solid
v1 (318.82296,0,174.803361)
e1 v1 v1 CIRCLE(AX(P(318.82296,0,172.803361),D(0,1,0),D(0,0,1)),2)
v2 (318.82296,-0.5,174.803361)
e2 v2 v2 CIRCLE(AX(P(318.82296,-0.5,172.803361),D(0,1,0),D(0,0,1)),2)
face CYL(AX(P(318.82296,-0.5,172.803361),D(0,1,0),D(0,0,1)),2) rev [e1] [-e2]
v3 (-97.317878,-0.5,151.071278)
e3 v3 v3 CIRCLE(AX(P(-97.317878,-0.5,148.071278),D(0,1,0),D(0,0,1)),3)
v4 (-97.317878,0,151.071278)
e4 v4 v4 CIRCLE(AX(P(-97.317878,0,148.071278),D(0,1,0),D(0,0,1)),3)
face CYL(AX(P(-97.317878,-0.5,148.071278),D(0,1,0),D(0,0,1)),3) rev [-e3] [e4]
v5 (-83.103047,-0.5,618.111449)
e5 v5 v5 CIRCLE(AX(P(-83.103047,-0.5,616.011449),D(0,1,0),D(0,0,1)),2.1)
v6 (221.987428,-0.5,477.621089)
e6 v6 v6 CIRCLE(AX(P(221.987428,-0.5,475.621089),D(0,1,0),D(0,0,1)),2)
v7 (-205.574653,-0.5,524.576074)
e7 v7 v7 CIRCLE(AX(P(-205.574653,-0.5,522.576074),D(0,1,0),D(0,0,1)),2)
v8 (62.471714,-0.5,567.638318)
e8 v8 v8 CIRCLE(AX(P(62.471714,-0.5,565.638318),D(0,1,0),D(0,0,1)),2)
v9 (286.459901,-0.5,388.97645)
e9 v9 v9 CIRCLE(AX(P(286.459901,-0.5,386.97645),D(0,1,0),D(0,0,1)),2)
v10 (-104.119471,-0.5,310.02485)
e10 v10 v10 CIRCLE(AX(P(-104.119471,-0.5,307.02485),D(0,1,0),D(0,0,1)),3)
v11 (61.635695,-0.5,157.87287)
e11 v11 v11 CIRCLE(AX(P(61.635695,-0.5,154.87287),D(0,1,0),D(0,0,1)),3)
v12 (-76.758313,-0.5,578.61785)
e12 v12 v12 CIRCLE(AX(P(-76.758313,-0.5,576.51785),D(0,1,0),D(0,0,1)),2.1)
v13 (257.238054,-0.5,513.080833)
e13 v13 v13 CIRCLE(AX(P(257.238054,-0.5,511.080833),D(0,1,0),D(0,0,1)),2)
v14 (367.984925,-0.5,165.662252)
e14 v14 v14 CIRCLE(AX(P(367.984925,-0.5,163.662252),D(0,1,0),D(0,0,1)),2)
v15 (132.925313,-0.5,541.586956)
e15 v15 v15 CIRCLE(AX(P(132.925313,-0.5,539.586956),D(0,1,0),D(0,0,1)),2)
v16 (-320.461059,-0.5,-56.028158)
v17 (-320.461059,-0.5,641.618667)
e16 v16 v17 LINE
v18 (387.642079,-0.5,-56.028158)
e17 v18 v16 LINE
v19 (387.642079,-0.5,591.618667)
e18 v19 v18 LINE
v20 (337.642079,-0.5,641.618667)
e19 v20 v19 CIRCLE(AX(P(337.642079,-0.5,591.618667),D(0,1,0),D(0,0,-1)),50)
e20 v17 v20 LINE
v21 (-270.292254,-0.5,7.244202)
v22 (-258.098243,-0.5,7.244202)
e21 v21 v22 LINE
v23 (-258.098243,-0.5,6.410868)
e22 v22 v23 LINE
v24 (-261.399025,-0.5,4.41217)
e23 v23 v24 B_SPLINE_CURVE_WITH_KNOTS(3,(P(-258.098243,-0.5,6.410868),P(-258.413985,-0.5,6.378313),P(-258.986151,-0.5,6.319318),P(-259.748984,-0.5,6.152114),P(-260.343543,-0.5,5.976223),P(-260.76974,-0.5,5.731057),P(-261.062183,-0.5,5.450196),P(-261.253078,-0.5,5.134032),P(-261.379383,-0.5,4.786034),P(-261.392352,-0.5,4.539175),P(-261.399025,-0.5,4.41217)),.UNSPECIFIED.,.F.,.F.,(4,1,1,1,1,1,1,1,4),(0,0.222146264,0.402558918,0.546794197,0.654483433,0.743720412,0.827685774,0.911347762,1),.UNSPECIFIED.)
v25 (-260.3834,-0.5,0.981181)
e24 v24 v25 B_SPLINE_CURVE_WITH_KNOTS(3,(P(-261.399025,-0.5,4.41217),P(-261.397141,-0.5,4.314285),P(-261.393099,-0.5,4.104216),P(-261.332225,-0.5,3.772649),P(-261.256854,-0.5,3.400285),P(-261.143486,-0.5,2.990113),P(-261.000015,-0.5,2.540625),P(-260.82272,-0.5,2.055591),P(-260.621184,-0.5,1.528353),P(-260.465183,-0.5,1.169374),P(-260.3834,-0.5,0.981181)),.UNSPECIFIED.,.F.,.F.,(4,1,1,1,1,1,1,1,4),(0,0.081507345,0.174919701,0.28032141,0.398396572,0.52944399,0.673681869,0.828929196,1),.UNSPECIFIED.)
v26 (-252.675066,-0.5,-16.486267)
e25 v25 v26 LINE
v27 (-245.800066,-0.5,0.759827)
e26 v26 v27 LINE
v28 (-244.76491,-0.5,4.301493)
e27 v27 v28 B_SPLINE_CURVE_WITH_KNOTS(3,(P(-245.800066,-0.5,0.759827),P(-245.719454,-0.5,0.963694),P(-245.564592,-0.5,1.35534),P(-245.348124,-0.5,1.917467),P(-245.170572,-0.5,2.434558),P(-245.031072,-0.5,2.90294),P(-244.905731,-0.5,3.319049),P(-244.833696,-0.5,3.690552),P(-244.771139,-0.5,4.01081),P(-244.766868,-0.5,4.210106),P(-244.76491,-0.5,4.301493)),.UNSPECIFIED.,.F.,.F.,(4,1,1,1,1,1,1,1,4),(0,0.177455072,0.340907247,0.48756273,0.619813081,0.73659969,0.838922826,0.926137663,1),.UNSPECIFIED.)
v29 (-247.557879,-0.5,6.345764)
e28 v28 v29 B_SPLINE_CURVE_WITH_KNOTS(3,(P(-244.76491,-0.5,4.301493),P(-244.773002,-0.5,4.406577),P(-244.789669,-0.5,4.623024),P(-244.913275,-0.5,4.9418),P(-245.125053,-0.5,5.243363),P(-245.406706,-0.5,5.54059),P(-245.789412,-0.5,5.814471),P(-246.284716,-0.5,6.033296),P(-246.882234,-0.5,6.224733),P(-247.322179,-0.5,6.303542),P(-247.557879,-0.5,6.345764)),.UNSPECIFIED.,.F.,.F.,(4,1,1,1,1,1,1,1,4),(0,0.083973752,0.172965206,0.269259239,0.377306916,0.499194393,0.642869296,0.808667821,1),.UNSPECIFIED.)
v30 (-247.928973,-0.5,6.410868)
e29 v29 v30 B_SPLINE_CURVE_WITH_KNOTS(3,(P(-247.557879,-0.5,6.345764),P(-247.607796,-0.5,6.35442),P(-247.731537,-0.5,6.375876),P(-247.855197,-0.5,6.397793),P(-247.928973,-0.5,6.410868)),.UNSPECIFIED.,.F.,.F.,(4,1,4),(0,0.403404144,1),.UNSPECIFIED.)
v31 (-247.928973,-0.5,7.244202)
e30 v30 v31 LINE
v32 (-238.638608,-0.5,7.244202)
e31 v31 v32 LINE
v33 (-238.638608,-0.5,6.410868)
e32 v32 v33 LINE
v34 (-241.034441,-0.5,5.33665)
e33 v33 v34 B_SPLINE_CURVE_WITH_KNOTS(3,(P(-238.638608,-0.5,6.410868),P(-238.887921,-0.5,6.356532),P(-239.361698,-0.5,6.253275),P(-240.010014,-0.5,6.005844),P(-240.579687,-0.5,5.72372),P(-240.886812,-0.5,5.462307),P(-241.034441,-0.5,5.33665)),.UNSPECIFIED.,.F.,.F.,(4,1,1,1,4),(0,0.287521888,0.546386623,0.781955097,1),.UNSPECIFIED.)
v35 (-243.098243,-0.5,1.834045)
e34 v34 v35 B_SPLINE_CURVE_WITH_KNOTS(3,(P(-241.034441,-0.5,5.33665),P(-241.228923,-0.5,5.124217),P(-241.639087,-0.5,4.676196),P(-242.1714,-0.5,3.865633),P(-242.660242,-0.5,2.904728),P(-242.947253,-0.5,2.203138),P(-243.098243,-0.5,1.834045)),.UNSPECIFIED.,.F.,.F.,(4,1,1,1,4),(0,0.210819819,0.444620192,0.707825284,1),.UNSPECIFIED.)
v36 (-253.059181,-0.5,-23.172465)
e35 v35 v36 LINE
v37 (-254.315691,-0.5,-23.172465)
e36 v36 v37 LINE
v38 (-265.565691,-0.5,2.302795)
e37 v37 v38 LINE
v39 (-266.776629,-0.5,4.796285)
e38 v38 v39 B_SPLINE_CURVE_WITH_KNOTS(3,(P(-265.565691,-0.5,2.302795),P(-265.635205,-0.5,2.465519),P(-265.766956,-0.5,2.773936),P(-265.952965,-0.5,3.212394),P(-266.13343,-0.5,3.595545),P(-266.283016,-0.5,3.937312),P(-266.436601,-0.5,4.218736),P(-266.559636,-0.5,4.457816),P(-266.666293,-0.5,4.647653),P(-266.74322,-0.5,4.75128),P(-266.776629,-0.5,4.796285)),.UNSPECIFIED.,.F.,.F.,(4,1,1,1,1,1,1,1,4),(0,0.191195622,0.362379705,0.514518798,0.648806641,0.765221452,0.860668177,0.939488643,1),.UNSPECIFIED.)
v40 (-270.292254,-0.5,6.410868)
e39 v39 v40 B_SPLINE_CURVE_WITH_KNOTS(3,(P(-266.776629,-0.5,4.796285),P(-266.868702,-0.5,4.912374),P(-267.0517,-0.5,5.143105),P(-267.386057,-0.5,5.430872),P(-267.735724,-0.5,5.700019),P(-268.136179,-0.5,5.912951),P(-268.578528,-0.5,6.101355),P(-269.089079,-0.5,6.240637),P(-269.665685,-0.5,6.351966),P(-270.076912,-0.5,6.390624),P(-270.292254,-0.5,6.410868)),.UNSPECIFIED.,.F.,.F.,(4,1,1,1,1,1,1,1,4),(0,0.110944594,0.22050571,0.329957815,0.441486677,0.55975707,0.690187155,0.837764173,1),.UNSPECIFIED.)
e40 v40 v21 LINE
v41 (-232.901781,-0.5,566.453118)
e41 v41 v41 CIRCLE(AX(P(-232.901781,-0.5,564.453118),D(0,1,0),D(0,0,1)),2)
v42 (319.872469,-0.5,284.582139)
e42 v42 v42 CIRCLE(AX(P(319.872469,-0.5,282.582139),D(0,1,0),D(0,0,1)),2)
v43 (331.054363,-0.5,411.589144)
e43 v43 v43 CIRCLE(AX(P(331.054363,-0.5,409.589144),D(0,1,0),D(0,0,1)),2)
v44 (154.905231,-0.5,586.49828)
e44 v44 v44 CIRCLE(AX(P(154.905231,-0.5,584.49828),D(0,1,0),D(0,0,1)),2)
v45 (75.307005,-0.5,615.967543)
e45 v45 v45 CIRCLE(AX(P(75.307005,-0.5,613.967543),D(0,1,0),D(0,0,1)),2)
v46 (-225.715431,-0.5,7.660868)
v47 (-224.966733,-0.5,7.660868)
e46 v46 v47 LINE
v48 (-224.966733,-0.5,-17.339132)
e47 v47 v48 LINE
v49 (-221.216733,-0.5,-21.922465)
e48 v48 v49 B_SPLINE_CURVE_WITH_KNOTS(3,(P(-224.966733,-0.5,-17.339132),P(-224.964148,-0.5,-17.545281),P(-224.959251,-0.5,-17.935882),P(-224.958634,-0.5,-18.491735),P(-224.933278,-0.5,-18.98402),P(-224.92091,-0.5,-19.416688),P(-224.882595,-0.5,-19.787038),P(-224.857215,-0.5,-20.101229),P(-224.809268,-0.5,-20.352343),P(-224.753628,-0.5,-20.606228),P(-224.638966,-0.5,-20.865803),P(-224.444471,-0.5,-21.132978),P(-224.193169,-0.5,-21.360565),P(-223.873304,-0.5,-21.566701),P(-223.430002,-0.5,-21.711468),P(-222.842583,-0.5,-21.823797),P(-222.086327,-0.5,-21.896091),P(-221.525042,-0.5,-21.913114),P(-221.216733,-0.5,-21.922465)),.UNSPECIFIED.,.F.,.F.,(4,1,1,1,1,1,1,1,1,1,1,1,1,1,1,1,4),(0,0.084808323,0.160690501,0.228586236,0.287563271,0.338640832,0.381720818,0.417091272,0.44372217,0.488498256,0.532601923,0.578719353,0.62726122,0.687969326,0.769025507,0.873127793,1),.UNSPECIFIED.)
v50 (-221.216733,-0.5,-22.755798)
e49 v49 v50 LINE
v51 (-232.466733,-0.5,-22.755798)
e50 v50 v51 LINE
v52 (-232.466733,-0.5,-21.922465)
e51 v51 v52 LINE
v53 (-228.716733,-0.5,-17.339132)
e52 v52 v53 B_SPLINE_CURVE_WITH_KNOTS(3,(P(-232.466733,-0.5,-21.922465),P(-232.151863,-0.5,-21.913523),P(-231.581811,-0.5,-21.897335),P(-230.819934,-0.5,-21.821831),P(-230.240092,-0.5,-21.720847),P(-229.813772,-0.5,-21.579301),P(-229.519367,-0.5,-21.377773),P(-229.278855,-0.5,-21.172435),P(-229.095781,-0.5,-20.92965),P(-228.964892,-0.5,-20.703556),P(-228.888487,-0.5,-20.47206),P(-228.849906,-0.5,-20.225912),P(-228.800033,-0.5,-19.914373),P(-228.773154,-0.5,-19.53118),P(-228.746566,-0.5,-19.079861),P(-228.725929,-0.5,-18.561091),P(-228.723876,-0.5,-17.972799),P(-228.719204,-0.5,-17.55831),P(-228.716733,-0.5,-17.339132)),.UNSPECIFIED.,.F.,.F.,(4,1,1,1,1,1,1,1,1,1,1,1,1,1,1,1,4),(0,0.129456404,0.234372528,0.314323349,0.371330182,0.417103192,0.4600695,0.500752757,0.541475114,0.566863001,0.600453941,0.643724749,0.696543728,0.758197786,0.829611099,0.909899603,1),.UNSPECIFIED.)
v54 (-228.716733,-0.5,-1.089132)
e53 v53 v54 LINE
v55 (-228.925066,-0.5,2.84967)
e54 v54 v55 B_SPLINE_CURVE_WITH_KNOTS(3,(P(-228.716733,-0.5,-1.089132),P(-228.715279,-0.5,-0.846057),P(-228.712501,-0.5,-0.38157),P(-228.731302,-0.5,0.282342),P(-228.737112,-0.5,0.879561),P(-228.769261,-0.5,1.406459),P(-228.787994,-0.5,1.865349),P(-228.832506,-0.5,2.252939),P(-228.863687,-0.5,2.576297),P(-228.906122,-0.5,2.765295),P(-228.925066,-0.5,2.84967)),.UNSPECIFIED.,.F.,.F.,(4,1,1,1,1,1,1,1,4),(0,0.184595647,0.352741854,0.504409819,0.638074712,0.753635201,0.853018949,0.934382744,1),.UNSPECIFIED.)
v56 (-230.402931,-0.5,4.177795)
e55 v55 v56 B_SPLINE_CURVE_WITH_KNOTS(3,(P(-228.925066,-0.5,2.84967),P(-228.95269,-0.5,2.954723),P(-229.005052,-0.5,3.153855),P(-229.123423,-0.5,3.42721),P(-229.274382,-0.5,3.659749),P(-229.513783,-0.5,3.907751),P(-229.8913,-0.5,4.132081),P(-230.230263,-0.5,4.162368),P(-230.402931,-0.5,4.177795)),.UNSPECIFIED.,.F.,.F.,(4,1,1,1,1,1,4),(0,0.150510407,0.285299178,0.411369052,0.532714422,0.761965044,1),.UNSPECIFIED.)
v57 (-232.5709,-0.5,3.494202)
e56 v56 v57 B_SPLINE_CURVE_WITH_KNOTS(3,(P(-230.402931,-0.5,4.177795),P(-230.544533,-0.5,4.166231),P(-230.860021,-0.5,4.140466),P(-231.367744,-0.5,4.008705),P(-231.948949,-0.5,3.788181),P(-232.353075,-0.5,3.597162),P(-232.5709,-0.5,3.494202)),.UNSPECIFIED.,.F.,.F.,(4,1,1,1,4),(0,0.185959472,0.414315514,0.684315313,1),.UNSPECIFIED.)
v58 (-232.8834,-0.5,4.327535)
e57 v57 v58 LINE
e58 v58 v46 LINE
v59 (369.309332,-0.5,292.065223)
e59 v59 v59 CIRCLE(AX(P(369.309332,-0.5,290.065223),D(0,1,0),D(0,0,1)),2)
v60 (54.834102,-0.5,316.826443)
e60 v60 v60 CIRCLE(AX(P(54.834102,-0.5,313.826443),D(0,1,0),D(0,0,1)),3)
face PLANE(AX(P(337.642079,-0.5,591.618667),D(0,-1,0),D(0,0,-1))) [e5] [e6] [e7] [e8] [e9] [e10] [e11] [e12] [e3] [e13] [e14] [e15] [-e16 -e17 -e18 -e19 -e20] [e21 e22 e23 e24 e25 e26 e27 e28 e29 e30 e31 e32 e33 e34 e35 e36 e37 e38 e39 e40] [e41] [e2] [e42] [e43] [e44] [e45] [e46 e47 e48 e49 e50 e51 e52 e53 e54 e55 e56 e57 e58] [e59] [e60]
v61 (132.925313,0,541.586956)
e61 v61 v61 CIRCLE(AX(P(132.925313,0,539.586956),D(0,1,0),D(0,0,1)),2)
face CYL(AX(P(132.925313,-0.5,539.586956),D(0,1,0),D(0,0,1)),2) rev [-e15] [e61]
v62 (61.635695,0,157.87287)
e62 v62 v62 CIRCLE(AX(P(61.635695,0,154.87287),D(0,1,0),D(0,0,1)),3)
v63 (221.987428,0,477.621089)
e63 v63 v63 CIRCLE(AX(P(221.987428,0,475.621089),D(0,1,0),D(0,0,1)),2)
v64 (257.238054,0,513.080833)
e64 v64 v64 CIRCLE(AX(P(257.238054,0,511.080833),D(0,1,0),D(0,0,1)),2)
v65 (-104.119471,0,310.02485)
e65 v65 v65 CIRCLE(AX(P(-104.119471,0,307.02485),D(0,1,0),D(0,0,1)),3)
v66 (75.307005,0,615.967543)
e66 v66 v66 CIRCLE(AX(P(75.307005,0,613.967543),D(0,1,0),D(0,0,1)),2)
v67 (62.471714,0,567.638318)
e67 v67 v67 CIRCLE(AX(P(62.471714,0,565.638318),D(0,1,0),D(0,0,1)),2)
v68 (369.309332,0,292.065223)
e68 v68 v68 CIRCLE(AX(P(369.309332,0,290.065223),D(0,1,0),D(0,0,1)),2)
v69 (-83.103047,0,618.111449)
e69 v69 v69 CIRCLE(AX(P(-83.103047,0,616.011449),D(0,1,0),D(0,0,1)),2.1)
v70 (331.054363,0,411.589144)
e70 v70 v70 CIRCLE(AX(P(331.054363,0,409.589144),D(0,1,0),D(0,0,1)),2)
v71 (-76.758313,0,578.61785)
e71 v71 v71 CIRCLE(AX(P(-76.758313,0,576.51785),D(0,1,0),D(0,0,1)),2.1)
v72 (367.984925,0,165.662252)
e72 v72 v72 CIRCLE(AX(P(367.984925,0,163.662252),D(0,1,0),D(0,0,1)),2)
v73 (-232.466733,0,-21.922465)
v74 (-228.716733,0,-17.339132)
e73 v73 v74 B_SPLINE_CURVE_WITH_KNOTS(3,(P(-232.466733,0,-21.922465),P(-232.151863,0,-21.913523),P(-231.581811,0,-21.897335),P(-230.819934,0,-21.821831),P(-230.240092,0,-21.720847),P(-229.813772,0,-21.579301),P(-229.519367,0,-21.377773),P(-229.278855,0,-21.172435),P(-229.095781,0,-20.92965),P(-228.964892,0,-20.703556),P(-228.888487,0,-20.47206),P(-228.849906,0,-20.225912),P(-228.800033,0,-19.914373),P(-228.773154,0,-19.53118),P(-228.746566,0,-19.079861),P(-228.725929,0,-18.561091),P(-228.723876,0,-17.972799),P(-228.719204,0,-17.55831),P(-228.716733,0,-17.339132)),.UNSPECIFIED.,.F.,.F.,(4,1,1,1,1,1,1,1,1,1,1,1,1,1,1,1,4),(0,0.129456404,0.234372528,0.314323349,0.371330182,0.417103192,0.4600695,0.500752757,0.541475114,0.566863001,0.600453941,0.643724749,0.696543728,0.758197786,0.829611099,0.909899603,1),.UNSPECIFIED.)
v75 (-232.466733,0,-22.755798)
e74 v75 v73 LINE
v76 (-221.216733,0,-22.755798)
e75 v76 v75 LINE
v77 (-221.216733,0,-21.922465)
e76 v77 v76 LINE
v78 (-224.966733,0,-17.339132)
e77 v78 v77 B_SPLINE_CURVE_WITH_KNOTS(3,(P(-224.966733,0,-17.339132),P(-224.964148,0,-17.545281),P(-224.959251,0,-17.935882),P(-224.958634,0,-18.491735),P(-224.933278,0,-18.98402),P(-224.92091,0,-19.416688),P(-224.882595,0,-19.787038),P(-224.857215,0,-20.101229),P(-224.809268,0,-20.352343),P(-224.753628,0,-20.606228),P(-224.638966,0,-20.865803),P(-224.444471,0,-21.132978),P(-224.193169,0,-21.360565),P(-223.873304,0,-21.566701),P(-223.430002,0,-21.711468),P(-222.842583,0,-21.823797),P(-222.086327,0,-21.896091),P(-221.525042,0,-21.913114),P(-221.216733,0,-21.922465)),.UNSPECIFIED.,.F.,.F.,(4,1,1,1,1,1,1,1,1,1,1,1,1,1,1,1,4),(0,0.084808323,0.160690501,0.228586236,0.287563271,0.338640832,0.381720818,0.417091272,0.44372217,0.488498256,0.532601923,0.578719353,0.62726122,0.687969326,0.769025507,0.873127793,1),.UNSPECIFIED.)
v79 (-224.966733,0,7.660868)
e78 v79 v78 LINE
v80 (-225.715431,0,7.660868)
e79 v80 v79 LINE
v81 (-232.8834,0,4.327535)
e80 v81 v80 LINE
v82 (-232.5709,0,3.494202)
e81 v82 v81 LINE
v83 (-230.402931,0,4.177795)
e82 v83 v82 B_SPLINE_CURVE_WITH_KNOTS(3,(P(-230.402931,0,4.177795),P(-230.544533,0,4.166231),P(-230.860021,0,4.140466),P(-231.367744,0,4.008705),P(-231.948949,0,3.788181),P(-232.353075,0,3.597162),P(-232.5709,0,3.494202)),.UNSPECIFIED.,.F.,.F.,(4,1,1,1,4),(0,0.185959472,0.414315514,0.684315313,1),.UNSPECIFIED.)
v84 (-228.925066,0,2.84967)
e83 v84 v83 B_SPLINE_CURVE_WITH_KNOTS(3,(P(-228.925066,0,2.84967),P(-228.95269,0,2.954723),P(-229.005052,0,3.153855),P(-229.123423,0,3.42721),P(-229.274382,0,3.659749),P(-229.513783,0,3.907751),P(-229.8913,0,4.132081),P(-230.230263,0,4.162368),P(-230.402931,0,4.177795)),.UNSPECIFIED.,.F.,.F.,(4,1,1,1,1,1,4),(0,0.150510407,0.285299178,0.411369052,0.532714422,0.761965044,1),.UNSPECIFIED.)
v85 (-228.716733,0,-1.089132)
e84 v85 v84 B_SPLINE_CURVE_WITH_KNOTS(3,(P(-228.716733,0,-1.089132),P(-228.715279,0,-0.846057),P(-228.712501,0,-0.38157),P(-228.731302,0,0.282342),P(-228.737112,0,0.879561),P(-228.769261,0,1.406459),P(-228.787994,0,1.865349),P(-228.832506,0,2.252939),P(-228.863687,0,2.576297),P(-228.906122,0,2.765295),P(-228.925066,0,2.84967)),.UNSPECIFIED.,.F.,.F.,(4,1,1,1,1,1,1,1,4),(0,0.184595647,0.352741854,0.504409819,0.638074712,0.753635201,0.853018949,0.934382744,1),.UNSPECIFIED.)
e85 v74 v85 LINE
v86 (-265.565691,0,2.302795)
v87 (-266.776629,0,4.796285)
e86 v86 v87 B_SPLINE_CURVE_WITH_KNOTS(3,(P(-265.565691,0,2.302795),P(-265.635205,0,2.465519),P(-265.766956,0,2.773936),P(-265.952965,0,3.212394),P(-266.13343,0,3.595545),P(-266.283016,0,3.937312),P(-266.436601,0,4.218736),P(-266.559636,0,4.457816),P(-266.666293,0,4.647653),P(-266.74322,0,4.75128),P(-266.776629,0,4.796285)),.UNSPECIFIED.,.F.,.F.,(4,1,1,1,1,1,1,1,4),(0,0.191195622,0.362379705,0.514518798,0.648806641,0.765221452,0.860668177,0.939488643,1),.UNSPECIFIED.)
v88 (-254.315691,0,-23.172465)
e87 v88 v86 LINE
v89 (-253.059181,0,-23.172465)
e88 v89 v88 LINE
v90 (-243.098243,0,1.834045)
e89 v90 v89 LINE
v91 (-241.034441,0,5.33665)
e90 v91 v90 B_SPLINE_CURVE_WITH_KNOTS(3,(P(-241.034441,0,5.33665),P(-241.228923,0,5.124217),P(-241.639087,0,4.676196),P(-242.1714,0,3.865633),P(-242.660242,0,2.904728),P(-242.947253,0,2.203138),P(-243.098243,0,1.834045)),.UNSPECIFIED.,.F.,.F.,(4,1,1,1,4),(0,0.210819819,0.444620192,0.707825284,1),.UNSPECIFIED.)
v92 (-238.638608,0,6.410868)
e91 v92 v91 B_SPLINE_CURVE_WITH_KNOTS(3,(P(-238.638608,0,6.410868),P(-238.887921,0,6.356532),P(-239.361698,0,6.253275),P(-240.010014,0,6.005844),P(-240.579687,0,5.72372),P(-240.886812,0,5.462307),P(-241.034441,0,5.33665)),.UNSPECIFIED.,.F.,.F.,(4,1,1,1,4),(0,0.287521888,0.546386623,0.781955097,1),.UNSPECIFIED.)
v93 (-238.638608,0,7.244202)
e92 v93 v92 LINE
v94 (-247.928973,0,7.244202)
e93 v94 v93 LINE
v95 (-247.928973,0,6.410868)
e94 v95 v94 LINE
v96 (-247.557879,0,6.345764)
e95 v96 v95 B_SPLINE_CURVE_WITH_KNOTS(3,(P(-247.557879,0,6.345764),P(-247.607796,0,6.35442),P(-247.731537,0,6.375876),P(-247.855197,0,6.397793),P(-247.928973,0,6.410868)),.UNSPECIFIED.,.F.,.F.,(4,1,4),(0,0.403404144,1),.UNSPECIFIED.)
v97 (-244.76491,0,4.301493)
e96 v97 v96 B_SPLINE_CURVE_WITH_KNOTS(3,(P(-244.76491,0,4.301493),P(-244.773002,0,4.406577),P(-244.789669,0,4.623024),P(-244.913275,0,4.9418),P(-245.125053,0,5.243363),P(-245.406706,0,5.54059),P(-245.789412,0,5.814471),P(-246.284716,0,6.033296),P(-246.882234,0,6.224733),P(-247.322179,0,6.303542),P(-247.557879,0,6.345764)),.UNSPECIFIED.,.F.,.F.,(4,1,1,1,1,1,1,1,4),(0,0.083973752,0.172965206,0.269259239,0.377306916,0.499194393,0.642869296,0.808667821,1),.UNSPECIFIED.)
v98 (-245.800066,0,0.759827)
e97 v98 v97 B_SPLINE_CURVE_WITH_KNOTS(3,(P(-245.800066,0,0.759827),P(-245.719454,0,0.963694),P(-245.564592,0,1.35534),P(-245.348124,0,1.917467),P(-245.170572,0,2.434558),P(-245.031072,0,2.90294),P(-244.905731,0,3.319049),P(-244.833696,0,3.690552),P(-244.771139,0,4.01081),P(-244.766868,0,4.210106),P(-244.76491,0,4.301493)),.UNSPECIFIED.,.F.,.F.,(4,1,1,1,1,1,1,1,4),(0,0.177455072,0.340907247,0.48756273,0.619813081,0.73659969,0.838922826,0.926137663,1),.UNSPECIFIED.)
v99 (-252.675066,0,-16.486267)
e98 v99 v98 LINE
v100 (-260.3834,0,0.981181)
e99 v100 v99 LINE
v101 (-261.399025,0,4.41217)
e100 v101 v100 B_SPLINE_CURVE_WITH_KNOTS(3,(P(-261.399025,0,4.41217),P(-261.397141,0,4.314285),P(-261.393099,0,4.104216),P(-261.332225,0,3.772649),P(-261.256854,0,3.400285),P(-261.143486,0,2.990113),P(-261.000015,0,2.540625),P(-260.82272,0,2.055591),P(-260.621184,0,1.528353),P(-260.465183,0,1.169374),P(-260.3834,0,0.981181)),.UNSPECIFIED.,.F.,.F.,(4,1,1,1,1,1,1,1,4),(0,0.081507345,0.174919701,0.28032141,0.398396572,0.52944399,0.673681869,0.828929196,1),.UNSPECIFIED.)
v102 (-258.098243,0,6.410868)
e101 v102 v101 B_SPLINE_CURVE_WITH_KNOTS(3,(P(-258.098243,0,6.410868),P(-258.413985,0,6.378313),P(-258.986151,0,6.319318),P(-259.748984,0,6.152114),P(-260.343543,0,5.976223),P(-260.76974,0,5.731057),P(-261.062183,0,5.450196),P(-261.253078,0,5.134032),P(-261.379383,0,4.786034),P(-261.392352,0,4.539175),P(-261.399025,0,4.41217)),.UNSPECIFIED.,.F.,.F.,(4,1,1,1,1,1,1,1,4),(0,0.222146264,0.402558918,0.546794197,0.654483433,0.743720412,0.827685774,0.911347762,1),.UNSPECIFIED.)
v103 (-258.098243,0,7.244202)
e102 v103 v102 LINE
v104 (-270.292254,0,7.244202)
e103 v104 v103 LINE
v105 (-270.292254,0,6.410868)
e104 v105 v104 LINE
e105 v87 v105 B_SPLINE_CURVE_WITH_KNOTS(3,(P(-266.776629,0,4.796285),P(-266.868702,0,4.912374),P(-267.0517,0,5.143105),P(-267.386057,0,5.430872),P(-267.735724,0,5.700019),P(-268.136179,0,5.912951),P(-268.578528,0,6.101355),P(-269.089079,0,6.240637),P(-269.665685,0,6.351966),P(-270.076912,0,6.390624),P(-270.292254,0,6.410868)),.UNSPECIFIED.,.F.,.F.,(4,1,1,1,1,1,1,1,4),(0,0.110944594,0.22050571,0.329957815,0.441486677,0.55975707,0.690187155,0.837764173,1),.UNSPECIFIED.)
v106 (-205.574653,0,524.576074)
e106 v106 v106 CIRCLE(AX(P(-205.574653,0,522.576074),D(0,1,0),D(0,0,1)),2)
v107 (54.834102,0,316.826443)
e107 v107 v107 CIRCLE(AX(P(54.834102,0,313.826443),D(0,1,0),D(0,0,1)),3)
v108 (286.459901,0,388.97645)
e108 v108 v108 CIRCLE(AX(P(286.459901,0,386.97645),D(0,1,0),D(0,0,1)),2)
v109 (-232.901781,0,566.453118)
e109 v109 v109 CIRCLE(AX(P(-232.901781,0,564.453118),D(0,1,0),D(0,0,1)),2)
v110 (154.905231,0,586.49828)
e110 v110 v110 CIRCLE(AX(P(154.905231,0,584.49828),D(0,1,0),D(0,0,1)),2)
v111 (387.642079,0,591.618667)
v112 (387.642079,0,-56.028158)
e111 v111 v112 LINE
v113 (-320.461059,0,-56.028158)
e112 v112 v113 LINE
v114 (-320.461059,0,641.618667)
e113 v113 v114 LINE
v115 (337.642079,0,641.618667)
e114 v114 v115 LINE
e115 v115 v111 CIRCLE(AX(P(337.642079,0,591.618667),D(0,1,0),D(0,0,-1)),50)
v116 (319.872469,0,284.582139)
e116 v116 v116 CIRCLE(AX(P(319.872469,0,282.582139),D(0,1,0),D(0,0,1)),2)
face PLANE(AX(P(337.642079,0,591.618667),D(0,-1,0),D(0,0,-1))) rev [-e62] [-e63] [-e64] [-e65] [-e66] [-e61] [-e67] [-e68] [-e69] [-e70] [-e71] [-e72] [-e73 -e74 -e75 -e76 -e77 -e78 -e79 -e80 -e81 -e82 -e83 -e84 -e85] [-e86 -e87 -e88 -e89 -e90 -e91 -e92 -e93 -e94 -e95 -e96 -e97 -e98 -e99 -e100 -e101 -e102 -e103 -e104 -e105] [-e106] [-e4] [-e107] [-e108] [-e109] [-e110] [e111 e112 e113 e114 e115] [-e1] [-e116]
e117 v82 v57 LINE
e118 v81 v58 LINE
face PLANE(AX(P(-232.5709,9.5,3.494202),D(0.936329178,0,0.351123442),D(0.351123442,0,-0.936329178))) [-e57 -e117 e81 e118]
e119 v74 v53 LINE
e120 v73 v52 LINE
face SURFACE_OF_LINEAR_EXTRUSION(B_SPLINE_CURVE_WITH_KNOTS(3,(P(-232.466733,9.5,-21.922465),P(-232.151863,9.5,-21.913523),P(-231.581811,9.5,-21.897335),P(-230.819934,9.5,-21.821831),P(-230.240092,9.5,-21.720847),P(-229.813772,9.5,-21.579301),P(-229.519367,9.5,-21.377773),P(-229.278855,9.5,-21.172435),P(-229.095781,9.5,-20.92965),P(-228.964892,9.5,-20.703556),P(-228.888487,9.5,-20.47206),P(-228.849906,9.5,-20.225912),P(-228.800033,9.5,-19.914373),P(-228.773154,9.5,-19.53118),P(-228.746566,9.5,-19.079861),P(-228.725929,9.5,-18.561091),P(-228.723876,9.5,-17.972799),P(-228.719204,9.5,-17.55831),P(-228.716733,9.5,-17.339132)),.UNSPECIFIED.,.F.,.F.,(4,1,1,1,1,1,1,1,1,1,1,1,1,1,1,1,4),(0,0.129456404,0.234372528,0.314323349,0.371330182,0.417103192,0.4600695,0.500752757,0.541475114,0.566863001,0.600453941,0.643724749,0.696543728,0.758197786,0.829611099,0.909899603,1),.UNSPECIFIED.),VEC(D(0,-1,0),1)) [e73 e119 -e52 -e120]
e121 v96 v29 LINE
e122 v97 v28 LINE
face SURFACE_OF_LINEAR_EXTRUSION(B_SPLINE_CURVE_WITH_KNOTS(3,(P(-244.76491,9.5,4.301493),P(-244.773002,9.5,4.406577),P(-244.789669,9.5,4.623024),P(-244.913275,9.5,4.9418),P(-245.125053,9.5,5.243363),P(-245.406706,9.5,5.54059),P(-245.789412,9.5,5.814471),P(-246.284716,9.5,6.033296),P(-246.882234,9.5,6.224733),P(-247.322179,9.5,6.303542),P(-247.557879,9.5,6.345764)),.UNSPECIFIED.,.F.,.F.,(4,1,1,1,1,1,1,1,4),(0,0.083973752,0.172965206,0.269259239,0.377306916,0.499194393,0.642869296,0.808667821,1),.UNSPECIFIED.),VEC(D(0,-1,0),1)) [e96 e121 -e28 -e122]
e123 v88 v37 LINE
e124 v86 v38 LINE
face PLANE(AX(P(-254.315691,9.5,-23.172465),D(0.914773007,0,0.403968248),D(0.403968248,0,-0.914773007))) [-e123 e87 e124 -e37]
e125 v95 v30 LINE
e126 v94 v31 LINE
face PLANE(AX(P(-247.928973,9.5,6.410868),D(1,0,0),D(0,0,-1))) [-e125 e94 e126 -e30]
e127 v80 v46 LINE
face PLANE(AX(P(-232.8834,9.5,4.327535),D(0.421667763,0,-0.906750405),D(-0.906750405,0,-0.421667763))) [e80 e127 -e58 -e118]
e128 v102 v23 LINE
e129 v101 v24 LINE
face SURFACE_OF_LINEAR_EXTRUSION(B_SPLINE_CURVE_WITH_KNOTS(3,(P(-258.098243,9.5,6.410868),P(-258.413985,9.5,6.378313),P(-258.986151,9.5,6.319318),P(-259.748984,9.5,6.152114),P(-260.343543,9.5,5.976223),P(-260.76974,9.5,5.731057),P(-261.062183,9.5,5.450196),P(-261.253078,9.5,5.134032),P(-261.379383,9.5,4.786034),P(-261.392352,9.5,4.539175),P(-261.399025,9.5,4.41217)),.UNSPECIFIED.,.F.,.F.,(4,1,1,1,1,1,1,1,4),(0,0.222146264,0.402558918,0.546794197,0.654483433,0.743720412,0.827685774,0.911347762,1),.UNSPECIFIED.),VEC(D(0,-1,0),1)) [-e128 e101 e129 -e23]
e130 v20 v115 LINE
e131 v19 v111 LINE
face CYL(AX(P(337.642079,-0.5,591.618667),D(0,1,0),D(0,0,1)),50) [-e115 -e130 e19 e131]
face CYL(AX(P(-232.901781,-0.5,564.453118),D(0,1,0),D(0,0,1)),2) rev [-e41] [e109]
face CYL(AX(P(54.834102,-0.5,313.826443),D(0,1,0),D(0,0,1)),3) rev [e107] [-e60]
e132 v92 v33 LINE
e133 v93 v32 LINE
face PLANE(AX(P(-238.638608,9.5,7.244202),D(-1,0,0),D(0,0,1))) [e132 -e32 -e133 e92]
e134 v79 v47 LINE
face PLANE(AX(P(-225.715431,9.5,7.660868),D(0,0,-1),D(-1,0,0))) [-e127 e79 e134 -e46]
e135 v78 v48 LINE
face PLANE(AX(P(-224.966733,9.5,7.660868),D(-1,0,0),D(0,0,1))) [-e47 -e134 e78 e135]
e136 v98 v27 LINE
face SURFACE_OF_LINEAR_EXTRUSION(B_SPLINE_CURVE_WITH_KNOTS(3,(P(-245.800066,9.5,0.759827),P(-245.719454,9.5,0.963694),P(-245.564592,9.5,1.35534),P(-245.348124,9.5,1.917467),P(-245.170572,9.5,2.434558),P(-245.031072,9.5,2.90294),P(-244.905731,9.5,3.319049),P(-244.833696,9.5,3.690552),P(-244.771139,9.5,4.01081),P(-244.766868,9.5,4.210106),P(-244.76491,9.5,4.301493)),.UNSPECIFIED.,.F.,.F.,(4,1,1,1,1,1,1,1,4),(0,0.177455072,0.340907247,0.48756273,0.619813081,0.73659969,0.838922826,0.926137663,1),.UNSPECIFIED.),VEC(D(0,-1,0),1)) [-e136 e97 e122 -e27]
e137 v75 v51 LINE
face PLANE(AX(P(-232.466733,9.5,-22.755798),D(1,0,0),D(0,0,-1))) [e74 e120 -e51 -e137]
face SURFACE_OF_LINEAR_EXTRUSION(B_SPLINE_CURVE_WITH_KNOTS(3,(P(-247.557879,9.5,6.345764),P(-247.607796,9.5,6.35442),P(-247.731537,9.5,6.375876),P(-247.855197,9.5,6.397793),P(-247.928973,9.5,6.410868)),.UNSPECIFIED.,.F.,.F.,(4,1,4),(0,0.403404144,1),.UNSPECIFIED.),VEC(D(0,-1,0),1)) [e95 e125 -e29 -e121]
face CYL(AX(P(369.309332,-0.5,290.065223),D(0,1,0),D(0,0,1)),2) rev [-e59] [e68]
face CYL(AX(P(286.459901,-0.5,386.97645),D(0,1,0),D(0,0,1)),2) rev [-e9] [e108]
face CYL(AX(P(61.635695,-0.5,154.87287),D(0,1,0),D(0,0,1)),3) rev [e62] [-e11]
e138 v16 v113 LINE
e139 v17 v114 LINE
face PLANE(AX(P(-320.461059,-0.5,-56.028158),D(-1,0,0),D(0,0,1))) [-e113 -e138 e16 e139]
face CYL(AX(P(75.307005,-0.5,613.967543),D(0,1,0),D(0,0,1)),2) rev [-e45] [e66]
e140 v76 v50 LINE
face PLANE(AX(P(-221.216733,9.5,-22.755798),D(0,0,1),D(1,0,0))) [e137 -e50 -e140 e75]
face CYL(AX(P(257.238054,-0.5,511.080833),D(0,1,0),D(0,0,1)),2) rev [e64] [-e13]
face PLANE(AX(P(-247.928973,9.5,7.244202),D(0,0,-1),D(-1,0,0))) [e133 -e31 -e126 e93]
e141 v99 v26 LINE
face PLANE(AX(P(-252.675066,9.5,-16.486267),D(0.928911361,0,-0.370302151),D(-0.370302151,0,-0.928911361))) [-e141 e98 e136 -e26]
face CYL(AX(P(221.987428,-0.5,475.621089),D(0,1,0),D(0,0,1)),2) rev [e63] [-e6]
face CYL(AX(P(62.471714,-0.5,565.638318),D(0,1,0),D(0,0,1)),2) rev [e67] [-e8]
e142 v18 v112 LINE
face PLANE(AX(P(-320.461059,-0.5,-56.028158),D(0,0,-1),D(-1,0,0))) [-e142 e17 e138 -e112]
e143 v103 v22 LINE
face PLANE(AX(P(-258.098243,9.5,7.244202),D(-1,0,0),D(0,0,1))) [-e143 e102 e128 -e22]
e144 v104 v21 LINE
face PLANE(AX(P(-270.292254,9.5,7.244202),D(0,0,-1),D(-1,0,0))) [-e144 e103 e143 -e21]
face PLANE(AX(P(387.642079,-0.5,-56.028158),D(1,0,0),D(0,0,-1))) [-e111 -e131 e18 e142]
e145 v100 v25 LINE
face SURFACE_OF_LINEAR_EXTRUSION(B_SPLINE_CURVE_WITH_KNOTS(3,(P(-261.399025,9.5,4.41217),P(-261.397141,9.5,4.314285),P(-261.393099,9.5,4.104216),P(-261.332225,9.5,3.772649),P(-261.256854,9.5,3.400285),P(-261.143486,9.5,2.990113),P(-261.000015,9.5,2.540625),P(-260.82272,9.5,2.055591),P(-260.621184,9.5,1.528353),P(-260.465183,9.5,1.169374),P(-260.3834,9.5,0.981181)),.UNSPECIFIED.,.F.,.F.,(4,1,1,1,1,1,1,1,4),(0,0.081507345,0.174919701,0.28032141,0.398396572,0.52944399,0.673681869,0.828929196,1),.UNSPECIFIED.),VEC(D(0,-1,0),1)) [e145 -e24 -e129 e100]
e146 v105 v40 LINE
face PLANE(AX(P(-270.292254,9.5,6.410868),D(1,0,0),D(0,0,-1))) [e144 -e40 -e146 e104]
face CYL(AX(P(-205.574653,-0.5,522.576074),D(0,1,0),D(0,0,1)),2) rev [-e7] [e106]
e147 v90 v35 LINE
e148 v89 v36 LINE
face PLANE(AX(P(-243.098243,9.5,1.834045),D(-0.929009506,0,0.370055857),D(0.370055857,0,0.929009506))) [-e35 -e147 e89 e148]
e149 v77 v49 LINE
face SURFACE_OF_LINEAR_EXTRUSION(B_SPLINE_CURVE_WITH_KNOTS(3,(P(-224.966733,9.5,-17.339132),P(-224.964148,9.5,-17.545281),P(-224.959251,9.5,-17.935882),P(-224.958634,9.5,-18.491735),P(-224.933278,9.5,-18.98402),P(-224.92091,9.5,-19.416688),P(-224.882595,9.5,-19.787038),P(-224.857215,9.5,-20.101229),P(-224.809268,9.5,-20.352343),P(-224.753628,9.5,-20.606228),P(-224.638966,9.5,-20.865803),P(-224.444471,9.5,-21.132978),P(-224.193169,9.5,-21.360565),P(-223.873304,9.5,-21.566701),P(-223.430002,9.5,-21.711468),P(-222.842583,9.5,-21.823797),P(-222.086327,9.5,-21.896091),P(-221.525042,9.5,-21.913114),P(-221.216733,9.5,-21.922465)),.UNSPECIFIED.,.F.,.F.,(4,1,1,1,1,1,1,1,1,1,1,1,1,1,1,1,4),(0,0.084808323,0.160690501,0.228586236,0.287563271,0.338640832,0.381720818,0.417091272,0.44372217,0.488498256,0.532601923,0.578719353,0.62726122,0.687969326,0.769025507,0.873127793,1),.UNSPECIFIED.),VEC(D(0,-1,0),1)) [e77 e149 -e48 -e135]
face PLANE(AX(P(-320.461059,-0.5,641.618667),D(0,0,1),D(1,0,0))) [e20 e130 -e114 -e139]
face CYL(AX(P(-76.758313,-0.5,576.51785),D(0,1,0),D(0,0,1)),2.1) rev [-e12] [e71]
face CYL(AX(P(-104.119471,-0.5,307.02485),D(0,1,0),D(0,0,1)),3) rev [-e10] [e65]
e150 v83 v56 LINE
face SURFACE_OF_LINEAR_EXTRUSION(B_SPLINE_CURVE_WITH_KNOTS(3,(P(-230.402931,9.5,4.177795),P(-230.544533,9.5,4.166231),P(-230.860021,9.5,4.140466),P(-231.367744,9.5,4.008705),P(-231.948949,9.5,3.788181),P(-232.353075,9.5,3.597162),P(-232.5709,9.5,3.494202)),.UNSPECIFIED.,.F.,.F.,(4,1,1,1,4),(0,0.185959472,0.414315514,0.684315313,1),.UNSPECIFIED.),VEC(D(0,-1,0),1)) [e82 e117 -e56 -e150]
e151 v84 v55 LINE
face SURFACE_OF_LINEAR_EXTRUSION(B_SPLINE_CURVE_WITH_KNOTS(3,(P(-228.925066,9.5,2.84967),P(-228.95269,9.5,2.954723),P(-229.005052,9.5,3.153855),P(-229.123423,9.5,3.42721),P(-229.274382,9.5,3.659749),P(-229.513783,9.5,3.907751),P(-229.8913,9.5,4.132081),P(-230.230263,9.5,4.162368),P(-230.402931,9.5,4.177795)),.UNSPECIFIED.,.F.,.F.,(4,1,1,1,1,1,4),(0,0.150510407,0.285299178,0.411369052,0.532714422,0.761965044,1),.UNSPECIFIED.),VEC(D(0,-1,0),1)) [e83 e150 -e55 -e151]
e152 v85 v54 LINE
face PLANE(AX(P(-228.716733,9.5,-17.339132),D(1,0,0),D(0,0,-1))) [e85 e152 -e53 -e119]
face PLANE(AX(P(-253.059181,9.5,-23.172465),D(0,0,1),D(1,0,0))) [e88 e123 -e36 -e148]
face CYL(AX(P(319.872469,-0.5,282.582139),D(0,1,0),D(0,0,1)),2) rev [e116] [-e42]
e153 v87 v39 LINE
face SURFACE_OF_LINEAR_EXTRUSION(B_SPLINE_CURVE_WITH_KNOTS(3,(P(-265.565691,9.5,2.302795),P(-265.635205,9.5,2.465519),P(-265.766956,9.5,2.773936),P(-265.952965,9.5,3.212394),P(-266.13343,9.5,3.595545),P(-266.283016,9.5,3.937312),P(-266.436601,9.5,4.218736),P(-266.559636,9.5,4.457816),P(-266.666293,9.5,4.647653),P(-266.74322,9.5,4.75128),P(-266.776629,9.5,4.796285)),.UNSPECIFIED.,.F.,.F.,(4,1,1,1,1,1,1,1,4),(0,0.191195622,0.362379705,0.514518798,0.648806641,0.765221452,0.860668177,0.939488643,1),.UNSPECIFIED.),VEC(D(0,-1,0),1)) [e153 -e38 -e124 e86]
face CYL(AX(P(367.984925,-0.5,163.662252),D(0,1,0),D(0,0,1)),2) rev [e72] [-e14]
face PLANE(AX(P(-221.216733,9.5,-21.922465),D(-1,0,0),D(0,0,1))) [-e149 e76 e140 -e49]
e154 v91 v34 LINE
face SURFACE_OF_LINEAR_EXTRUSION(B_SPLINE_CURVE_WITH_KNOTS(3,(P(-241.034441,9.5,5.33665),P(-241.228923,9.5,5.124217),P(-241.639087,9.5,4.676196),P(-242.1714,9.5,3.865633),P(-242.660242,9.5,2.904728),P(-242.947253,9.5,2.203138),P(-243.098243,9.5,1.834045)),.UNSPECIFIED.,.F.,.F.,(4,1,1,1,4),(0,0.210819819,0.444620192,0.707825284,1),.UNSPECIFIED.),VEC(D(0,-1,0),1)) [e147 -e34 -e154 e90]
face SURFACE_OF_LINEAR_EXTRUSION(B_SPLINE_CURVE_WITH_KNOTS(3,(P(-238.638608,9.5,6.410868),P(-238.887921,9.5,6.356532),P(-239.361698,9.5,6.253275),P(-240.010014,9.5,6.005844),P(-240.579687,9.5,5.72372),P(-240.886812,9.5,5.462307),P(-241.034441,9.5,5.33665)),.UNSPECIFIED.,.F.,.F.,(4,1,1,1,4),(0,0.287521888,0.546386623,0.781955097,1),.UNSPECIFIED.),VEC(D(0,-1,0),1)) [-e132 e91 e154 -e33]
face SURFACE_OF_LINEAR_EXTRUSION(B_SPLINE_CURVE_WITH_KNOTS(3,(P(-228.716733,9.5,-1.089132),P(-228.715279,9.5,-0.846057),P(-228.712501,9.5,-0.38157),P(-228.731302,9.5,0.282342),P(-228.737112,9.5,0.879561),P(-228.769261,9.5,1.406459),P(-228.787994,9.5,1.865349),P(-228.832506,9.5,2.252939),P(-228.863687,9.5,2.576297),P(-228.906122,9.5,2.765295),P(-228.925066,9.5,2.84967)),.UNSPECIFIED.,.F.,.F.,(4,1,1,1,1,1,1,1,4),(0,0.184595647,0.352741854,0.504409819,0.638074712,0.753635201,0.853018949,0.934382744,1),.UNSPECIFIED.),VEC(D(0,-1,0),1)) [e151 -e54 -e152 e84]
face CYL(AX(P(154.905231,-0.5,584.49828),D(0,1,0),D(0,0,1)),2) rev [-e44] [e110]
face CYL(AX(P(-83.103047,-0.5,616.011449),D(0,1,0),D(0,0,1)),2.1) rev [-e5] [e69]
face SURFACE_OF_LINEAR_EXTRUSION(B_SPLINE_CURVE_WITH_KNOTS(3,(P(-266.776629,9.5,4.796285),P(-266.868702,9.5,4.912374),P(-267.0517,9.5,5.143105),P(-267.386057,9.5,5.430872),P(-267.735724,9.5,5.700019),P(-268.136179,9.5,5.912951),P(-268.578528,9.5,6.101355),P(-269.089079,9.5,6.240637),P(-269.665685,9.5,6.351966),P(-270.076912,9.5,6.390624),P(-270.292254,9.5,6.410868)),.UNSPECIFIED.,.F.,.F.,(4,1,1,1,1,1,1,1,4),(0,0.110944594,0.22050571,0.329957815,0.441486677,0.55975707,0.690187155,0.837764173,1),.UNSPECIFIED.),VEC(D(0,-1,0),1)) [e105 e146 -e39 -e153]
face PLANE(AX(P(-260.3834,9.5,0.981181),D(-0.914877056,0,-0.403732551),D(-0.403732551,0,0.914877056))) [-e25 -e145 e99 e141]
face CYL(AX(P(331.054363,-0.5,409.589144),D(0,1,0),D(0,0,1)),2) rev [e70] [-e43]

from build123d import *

# Parameters (mm, degrees)
SKETCH_1_R             = 2
SKETCH_1_R_2           = 2.1
SKETCH_1_R_3           = 3
SM_BASE_FLANGE_1_DEPTH = 0.5
CUT_EXTRUDE_1_DEPTH    = 10


# Sheet-metal steps are written as plain solids
with BuildPart() as part:
    # Sketch 1 → Базовая кромка1 (new body)
    with BuildSketch(Plane(origin=(0, 0, 0), x_dir=(-1, 0, 0), z_dir=(0, 1, 0))):
        with BuildLine():
            Line((320.461059476, -56.028158177), (-387.642079341, -56.028158177))
            Line((-387.642079341, -56.028158177), (-387.642079341, 591.618667046))
            ThreePointArc((-387.642079341, 591.618667046), (-372.9974184, 626.974006105), (-337.642079341, 641.618667046))
            Line((-337.642079341, 641.618667046), (320.461059476, 641.618667046))
            Line((320.461059476, 641.618667046), (320.461059476, -56.028158177))
        make_face()
        with Locations(Location((232.901780581, 564.453118264, 0), (0, 0, 90))):
            Circle(SKETCH_1_R, mode=Mode.SUBTRACT)
        with Locations(Location((205.574652668, 522.576074481, 0), (0, 0, 90))):
            Circle(SKETCH_1_R, mode=Mode.SUBTRACT)
        with Locations(Location((76.758312789, 576.517850099, 0), (0, 0, 90))):
            Circle(SKETCH_1_R_2, mode=Mode.SUBTRACT)
        with Locations(Location((83.103047022, 616.011448916, 0), (0, 0, 90))):
            Circle(SKETCH_1_R_2, mode=Mode.SUBTRACT)
        with Locations(Location((-62.471713971, 565.638317713, 0), (0, 0, 90))):
            Circle(SKETCH_1_R, mode=Mode.SUBTRACT)
        with Locations(Location((-75.307004693, 613.967543116, 0), (0, 0, 90))):
            Circle(SKETCH_1_R, mode=Mode.SUBTRACT)
        with Locations(Location((-154.905231477, 584.498280208, 0), (0, 0, 90))):
            Circle(SKETCH_1_R, mode=Mode.SUBTRACT)
        with Locations(Location((-132.925313212, 539.586955948, 0), (0, 0, 90))):
            Circle(SKETCH_1_R, mode=Mode.SUBTRACT)
        with Locations(Location((-257.23805391, 511.080832587, 0), (0, 0, 90))):
            Circle(SKETCH_1_R, mode=Mode.SUBTRACT)
        with Locations(Location((-221.98742832, 475.621089278, 0), (0, 0, 90))):
            Circle(SKETCH_1_R, mode=Mode.SUBTRACT)
        with Locations(Location((-331.054363434, 409.589144393, 0), (0, 0, 90))):
            Circle(SKETCH_1_R, mode=Mode.SUBTRACT)
        with Locations(Location((-286.459901196, 386.976450223, 0), (0, 0, 90))):
            Circle(SKETCH_1_R, mode=Mode.SUBTRACT)
        with Locations(Location((-319.872468675, 282.582139428, 0), (0, 0, 90))):
            Circle(SKETCH_1_R, mode=Mode.SUBTRACT)
        with Locations(Location((-369.309331997, 290.065223337, 0), (0, 0, 90))):
            Circle(SKETCH_1_R, mode=Mode.SUBTRACT)
        with Locations(Location((-367.98492513, 163.662251503, 0), (0, 0, 90))):
            Circle(SKETCH_1_R, mode=Mode.SUBTRACT)
        with Locations(Location((-318.822959797, 172.803360874, 0), (0, 0, 90))):
            Circle(SKETCH_1_R, mode=Mode.SUBTRACT)
        with Locations(Location((-54.834101722, 313.826443363, 0), (0, 0, 90))):
            Circle(SKETCH_1_R_3, mode=Mode.SUBTRACT)
        with Locations(Location((104.119471165, 307.024850425, 0), (0, 0, 90))):
            Circle(SKETCH_1_R_3, mode=Mode.SUBTRACT)
        with Locations(Location((-61.635694659, 154.872870476, 0), (0, 0, 90))):
            Circle(SKETCH_1_R_3, mode=Mode.SUBTRACT)
        with Locations(Location((97.317878227, 148.071277538, 0), (0, 0, 90))):
            Circle(SKETCH_1_R_3, mode=Mode.SUBTRACT)
    extrude(amount=-SM_BASE_FLANGE_1_DEPTH)

    # Эскиз2 → Вырез-Вытянуть1 (cut)
    with BuildSketch(Plane.XZ.offset(0.5)):
        with BuildLine():
            Line((-238.638607967, 7.24420169), (-238.638607967, 6.410868357))
            add(Edge.make_bspline(
                [(-238.638607967, 6.410868357), (-238.887920943, 6.356531892), (-239.361698003, 6.253274648), (-240.010014158, 6.005844395), (-240.579687398, 5.723720139), (-240.886811511, 5.462306893), (-241.034441301, 5.336649607)],
                knots=[0, 0, 0, 0, 1.150087553, 2.185546491, 3.127820389, 4, 4, 4, 4], degree=3))
            add(Edge.make_bspline(
                [(-241.034441301, 5.336649607), (-241.2289233, 5.124217162), (-241.639086939, 4.676195933), (-242.171400324, 3.865633151), (-242.660242043, 2.904728338), (-242.947252605, 2.203138475), (-243.098243384, 1.83404544)],
                knots=[0, 0, 0, 0, 0.843279275, 1.778480768, 2.831301136, 4, 4, 4, 4], degree=3))
            Line((-243.098243384, 1.83404544), (-253.059180884, -23.172464977))
            Line((-253.059180884, -23.172464977), (-254.315691301, -23.172464977))
            Line((-254.315691301, -23.172464977), (-265.565691301, 2.30279544))
            add(Edge.make_bspline(
                [(-265.565691301, 2.30279544), (-265.635204754, 2.465519316), (-265.766956018, 2.773935533), (-265.952964924, 3.212394285), (-266.133429648, 3.595545189), (-266.283015563, 3.93731222), (-266.436601122, 4.218736379), (-266.559636482, 4.457816164), (-266.666293014, 4.647652778), (-266.743219764, 4.751280041), (-266.776628801, 4.796285023)],
                knots=[0, 0, 0, 0, 1.529564973, 2.899037637, 4.116150385, 5.19045313, 6.121771619, 6.885345418, 7.515909146, 8, 8, 8, 8], degree=3))
            add(Edge.make_bspline(
                [(-266.776628801, 4.796285023), (-266.868701796, 4.912374251), (-267.051699637, 5.143105075), (-267.386057338, 5.430872282), (-267.735723563, 5.700019464), (-268.136179251, 5.912951287), (-268.578527638, 6.101354992), (-269.089078885, 6.240636623), (-269.665685062, 6.351965832), (-270.076911817, 6.39062447), (-270.292253801, 6.410868357)],
                knots=[0, 0, 0, 0, 0.887556751, 1.764045677, 2.639662523, 3.531893419, 4.478056563, 5.521497236, 6.702113387, 8, 8, 8, 8], degree=3))
            Line((-270.292253801, 6.410868357), (-270.292253801, 7.24420169))
            Line((-270.292253801, 7.24420169), (-258.098243384, 7.24420169))
            Line((-258.098243384, 7.24420169), (-258.098243384, 6.410868357))
            add(Edge.make_bspline(
                [(-258.098243384, 6.410868357), (-258.413985072, 6.378312804), (-258.986151491, 6.319317763), (-259.748984223, 6.152113961), (-260.343542999, 5.976223328), (-260.769740392, 5.731057073), (-261.062182725, 5.450195949), (-261.25307777, 5.134032333), (-261.379383471, 4.786033635), (-261.392352386, 4.539174533), (-261.399024634, 4.41217044)],
                knots=[0, 0, 0, 0, 1.777170112, 3.220471342, 4.374353576, 5.235867464, 5.949763295, 6.621486191, 7.290782096, 8, 8, 8, 8], degree=3))
            add(Edge.make_bspline(
                [(-261.399024634, 4.41217044), (-261.397140976, 4.314284552), (-261.393098531, 4.104215504), (-261.332225013, 3.77264945), (-261.256853901, 3.400284886), (-261.143486252, 2.990113081), (-261.00001471, 2.540624798), (-260.822719603, 2.055591395), (-260.62118426, 1.528353146), (-260.46518273, 1.169374033), (-260.383399634, 0.981180857)],
                knots=[0, 0, 0, 0, 0.652058758, 1.399357611, 2.242571281, 3.187172578, 4.235551921, 5.389454952, 6.631433566, 8, 8, 8, 8], degree=3))
            Line((-260.383399634, 0.981180857), (-252.675066301, -16.48626706))
            Line((-252.675066301, -16.48626706), (-245.800066301, 0.75982669))
            add(Edge.make_bspline(
                [(-245.800066301, 0.75982669), (-245.719454387, 0.963693639), (-245.564591609, 1.35534049), (-245.348124186, 1.91746745), (-245.170572247, 2.434558038), (-245.031072342, 2.902939803), (-244.905731089, 3.31904924), (-244.83369646, 3.690551992), (-244.771138753, 4.010810181), (-244.766868285, 4.210105839), (-244.764910051, 4.301493357)],
                knots=[0, 0, 0, 0, 1.419640579, 2.727257979, 3.900501837, 4.958504646, 5.892797517, 6.711382607, 7.409101305, 8, 8, 8, 8], degree=3))
            add(Edge.make_bspline(
                [(-244.764910051, 4.301493357), (-244.773002004, 4.406577173), (-244.789669431, 4.623023904), (-244.913274914, 4.94179987), (-245.125052837, 5.243363405), (-245.406706082, 5.540589582), (-245.789411534, 5.814470824), (-246.284715527, 6.033295875), (-246.882233857, 6.224733044), (-247.32217895, 6.303542276), (-247.557878801, 6.34576419)],
                knots=[0, 0, 0, 0, 0.671790012, 1.383721652, 2.154073914, 3.018455332, 3.993555146, 5.14295437, 6.469342564, 8, 8, 8, 8], degree=3))
            add(Edge.make_bspline(
                [(-247.557878801, 6.34576419), (-247.607796371, 6.354419769), (-247.731537217, 6.375876117), (-247.855197399, 6.397792897), (-247.928972551, 6.410868357)],
                knots=[0, 0, 0, 0, 0.806808289, 2, 2, 2, 2], degree=3))
            Line((-247.928972551, 6.410868357), (-247.928972551, 7.24420169))
            Line((-247.928972551, 7.24420169), (-238.638607967, 7.24420169))
        make_face()
        with BuildLine():
            Line((-232.883399634, 4.327535023), (-225.715430884, 7.660868357))
            Line((-225.715430884, 7.660868357), (-224.966732967, 7.660868357))
            Line((-224.966732967, 7.660868357), (-224.966732967, -17.339131643))
            add(Edge.make_bspline(
                [(-224.966732967, -17.339131643), (-224.964148451, -17.54528094), (-224.95925144, -17.935882153), (-224.958633965, -18.491735024), (-224.933277629, -18.984019608), (-224.920909697, -19.416687861), (-224.88259517, -19.787038272), (-224.857215008, -20.101229384), (-224.809267684, -20.352343137), (-224.753628113, -20.606227792), (-224.638966485, -20.865803418), (-224.444470946, -21.132977798), (-224.193169184, -21.360565096), (-223.873304192, -21.566700932), (-223.430002155, -21.711467683), (-222.842582632, -21.823796867), (-222.086326505, -21.896090628), (-221.525041669, -21.913114124), (-221.216732967, -21.922464977)],
                knots=[0, 0, 0, 0, 1.356933168, 2.571048021, 3.657379777, 4.601012336, 5.418253307, 6.107533085, 6.673460353, 7.099554724, 7.815972102, 8.521630774, 9.259509655, 10.036179522, 11.007509208, 12.304408113, 13.970044684, 16, 16, 16, 16], degree=3))
            Line((-221.216732967, -21.922464977), (-221.216732967, -22.75579831))
            Line((-221.216732967, -22.75579831), (-232.466732967, -22.75579831))
            Line((-232.466732967, -22.75579831), (-232.466732967, -21.922464977))
            add(Edge.make_bspline(
                [(-232.466732967, -21.922464977), (-232.151863023, -21.913523284), (-231.581811158, -21.897334923), (-230.819934057, -21.821831214), (-230.240092303, -21.720846522), (-229.81377244, -21.579301172), (-229.519367415, -21.377773106), (-229.27885518, -21.172435319), (-229.095780994, -20.929650127), (-228.964891948, -20.7035562), (-228.888486982, -20.472060194), (-228.849905789, -20.225912454), (-228.800033291, -19.914373104), (-228.773154421, -19.531179636), (-228.746566357, -19.079861376), (-228.725928909, -18.561090593), (-228.723876471, -17.972799021), (-228.719203827, -17.558310254), (-228.716732967, -17.339131643)],
                knots=[0, 0, 0, 0, 2.071302469, 3.74996044, 5.029173581, 5.941282905, 6.673651071, 7.361112001, 8.012044112, 8.663601818, 9.069808009, 9.607263055, 10.29959599, 11.144699654, 12.131164582, 13.273777592, 14.558393644, 16, 16, 16, 16], degree=3))
            Line((-228.716732967, -17.339131643), (-228.716732967, -1.089131643))
            add(Edge.make_bspline(
                [(-228.716732967, -1.089131643), (-228.715279115, -0.846057441), (-228.712500965, -0.381569541), (-228.731302282, 0.282341543), (-228.737111547, 0.87956103), (-228.769261199, 1.406458806), (-228.787994037, 1.865349032), (-228.832506476, 2.252939392), (-228.8636868, 2.576296711), (-228.906121867, 2.765295196), (-228.925066301, 2.84967044)],
                knots=[0, 0, 0, 0, 1.476765178, 2.821934835, 4.035278551, 5.104597693, 6.029081604, 6.824151588, 7.47506195, 8, 8, 8, 8], degree=3))
            add(Edge.make_bspline(
                [(-228.925066301, 2.84967044), (-228.952689863, 2.954723148), (-229.005051556, 3.153855234), (-229.123423276, 3.427209831), (-229.274382335, 3.659749118), (-229.513782692, 3.907751047), (-229.891300331, 4.132081268), (-230.230263351, 4.162367602), (-230.402930884, 4.17779544)],
                knots=[0, 0, 0, 0, 0.903062441, 1.711795068, 2.468214314, 3.196286531, 4.571790261, 6, 6, 6, 6], degree=3))
            add(Edge.make_bspline(
                [(-230.402930884, 4.17779544), (-230.54453314, 4.166231248), (-230.8600213, 4.140466365), (-231.36774428, 4.00870525), (-231.948948677, 3.78818148), (-232.353075019, 3.597161632), (-232.570899634, 3.49420169)],
                knots=[0, 0, 0, 0, 0.743837888, 1.657262055, 2.737261251, 4, 4, 4, 4], degree=3))
            Line((-232.570899634, 3.49420169), (-232.883399634, 4.327535023))
        make_face()
    extrude(amount=-CUT_EXTRUDE_1_DEPTH, mode=Mode.SUBTRACT)


solid = part.part
